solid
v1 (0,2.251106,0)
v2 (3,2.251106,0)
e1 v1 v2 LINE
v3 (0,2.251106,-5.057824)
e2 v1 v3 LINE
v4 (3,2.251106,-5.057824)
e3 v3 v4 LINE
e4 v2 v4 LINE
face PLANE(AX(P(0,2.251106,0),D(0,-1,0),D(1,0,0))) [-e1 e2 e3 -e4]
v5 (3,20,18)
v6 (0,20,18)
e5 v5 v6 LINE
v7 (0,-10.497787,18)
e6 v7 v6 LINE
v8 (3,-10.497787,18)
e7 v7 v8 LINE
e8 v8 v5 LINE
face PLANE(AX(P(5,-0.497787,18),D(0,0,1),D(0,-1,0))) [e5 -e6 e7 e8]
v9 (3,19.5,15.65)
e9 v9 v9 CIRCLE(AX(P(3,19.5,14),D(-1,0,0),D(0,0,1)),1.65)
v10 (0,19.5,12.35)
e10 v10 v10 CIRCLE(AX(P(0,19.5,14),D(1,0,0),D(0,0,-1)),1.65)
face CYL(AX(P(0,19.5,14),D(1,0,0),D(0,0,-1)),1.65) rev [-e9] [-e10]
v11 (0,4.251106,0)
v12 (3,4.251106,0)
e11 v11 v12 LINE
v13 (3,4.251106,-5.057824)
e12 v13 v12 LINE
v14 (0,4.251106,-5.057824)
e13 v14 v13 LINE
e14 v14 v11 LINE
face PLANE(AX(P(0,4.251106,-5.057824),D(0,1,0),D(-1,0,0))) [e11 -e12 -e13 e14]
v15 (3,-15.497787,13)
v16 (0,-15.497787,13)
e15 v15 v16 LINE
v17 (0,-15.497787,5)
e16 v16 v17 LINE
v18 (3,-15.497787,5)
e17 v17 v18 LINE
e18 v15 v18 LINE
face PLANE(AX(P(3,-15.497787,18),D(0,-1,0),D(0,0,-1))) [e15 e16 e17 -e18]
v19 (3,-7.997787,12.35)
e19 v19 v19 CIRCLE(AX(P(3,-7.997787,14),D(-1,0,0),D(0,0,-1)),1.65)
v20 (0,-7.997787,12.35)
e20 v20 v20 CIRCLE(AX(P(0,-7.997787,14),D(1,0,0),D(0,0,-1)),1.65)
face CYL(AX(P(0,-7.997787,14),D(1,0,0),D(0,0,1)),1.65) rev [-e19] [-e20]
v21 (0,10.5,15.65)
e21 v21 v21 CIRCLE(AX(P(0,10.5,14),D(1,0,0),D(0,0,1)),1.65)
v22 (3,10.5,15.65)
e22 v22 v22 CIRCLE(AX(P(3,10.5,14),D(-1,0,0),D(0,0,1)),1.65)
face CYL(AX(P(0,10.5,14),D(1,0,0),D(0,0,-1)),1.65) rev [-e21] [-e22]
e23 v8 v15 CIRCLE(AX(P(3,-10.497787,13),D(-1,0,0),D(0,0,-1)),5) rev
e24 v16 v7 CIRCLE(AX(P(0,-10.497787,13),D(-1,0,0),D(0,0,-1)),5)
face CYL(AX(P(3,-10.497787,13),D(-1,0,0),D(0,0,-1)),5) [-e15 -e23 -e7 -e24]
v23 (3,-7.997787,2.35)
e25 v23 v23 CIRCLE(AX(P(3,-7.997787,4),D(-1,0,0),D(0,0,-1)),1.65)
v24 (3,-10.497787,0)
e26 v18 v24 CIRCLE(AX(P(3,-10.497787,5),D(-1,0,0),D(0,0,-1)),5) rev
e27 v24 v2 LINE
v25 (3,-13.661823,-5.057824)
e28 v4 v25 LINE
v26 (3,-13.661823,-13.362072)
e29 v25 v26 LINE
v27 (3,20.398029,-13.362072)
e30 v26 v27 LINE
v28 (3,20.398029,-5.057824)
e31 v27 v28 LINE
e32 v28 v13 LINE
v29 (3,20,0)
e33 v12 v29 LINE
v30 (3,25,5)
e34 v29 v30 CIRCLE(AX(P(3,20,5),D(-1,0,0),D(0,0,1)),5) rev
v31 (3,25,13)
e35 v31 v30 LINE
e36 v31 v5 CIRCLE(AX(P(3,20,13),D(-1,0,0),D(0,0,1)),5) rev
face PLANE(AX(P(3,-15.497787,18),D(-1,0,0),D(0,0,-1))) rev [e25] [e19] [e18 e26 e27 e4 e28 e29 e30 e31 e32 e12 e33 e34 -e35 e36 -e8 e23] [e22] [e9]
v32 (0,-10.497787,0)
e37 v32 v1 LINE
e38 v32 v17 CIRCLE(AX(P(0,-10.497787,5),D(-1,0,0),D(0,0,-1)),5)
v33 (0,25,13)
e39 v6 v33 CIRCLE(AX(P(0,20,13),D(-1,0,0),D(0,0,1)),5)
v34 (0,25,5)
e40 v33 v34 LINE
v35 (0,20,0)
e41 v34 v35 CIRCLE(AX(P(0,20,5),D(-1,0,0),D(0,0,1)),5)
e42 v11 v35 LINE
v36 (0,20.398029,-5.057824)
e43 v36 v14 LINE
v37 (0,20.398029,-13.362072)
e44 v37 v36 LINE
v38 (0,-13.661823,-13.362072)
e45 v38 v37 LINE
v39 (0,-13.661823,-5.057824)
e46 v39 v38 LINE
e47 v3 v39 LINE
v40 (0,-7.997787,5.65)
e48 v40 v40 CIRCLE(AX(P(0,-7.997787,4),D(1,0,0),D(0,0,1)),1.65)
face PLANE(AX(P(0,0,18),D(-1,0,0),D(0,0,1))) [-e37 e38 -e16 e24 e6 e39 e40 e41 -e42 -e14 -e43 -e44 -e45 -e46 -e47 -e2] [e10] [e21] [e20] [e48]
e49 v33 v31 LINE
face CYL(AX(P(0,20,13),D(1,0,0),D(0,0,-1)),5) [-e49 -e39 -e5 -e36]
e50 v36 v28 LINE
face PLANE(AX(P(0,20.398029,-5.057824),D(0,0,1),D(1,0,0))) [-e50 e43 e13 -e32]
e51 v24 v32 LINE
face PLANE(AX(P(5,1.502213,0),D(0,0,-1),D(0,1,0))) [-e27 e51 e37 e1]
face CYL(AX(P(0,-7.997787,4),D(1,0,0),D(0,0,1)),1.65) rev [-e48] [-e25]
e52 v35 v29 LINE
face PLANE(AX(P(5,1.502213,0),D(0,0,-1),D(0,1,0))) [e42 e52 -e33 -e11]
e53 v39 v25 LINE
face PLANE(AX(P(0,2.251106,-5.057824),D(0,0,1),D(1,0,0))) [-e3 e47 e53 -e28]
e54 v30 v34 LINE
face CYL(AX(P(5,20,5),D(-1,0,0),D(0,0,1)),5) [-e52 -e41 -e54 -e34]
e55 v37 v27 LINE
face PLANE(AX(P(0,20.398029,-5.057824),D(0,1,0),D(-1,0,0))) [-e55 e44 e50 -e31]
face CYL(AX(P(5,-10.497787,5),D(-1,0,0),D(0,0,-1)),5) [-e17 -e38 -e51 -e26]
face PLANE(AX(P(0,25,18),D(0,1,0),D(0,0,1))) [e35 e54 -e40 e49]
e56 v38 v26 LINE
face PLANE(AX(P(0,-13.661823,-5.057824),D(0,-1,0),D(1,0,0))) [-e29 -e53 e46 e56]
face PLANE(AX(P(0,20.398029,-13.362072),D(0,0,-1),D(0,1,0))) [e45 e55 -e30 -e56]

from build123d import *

# Parameters (mm, degrees)
T_LE_DE_BASE_PLI_E1_DEPTH    = 18
ENL_V_MAT_EXTRU_1_DEPTH      = 36.185224172
ENL_V_MAT_EXTRU_1_DEPTH_BACK = 36.185224172
ESQUISSE6_R                  = 1.65
ENL_V_MAT_EXTRU_2_DEPTH      = 35.756294394
ENL_V_MAT_EXTRU_2_DEPTH_BACK = 35.756294394
ESQUISSE7_R                  = 1.65
CONG_1_R                     = 5
BOSS_EXTRU_1_OUTLINE_R       = 1.65
BOSS_EXTRU_1_DEPTH           = 17
BOSS_EXTRU_1_START           = -3
BOSS_EXTRU_1_2_OUTLINE_R     = 1.65
BOSS_EXTRU_1_2_DEPTH         = 3


with BuildPart() as part:
    # Tôle de base pliée1: sheet metal written as solids
    # Esquisse1 → Tôle de base pliée1 (new body)
    with BuildSketch(Plane.XY):
        with BuildLine():
            Line((20, 0), (5, 0))
            ThreePointArc((5, 0), (1.464466094, 1.464466094), (0, 5))
            Line((0, 5), (0, 25))
            Line((0, 25), (3, 25))
            Line((3, 25), (3, 5))
            ThreePointArc((3, 5), (3.585786438, 3.585786438), (5, 3))
            Line((5, 3), (20, 3))
            Line((20, 3), (20, 0))
        make_face()
    extrude(amount=T_LE_DE_BASE_PLI_E1_DEPTH)

    # Esquisse6 → Enlèv. mat.-Extru.1 (cut, two sides: drawn at the far end of the back side and taken through both)
    with BuildSketch(Plane(origin=(3, 0, 0), x_dir=(0, 0, -1), z_dir=(1, 0, 0)).offset(-ENL_V_MAT_EXTRU_1_DEPTH_BACK)):
        with Locations((-14, 19.5)):
            Circle(ESQUISSE6_R)
        with Locations(Location((-14, 10.5, 0), (0, 0, 180))):
            Circle(ESQUISSE6_R)
    extrude(amount=ENL_V_MAT_EXTRU_1_DEPTH + ENL_V_MAT_EXTRU_1_DEPTH_BACK, mode=Mode.SUBTRACT)

    # Esquisse7 → Enlèv. mat.-Extru.2 (cut, two sides: drawn at the far end of the back side and taken through both)
    with BuildSketch(Plane(origin=(0, 3, 0), x_dir=(1, 0, 0), z_dir=(0, 1, 0)).offset(-ENL_V_MAT_EXTRU_2_DEPTH_BACK)):
        with Locations(Location((12.5, -4, 0), (0, 0, 270))):
            Circle(ESQUISSE7_R)
        with Locations(Location((12.5, -14, 0), (0, 0, 90))):
            Circle(ESQUISSE7_R)
    extrude(amount=ENL_V_MAT_EXTRU_2_DEPTH + ENL_V_MAT_EXTRU_2_DEPTH_BACK, mode=Mode.SUBTRACT)

    # Congé1
    cong_1_edges = [part.edges().sort_by_distance(p)[0] for p in [
        (20, 1.5, 18),
        (1.5, 25, 18),
        (20, 1.5, 0),
        (1.5, 25, 0),
    ]]
    fillet(cong_1_edges, radius=CONG_1_R)

    # Boss.-Extru.1: read off the stored shape, not the designer's step
    # Boss.-Extru.1 outline → Boss.-Extru.1 (cut)
    with BuildSketch(Plane(origin=(3, 0, 0), x_dir=(0, 0, -1), z_dir=(1, 0, 0))):
        with BuildLine():
            Line((-13, -15.497787144), (-5, -15.497787144))
            ThreePointArc((-5, -15.497787144), (-1.464466094, -14.03332105), (0, -10.497787144))
            Line((0, -10.497787144), (0, 2.251106428))
            Line((0, 2.251106428), (5.057824139, 2.251106428))
            Line((5.057824139, 2.251106428), (5.057824139, -13.661822952))
            Line((5.057824139, -13.661822952), (13.362072183, -13.661822952))
            Line((13.362072183, -13.661822952), (13.362072183, 20.398028744))
            Line((13.362072183, 20.398028744), (5.057824139, 20.398028744))
            Line((5.057824139, 20.398028744), (5.057824139, 4.251106428))
            Line((5.057824139, 4.251106428), (0, 4.251106428))
            Line((0, 4.251106428), (0, 20))
            ThreePointArc((0, 20), (-1.464466094, 23.535533906), (-5, 25))
            Line((-5, 25), (-13, 25))
            ThreePointArc((-13, 25), (-16.535533906, 23.535533906), (-18, 20))
            Line((-18, 20), (-18, -10.497787144))
            ThreePointArc((-18, -10.497787144), (-16.535533906, -14.03332105), (-13, -15.497787144))
        make_face()
        with Locations((-14, -7.997787144)):
            Circle(BOSS_EXTRU_1_OUTLINE_R, mode=Mode.SUBTRACT)
        with Locations((-4, -7.997787144)):
            Circle(BOSS_EXTRU_1_OUTLINE_R, mode=Mode.SUBTRACT)
        with Locations((-14, 10.5)):
            Circle(BOSS_EXTRU_1_OUTLINE_R, mode=Mode.SUBTRACT)
        with Locations((-14, 19.5)):
            Circle(BOSS_EXTRU_1_OUTLINE_R, mode=Mode.SUBTRACT)
    extrude(amount=BOSS_EXTRU_1_DEPTH, mode=Mode.SUBTRACT)

    # Boss.-Extru.1 2 outline → Boss.-Extru.1 2 (add)
    with BuildSketch(Plane(origin=(3, 0, 0), x_dir=(0, 0, -1), z_dir=(1, 0, 0)).offset(BOSS_EXTRU_1_START)):
        with BuildLine():
            Line((-13, -15.497787144), (-5, -15.497787144))
            ThreePointArc((-5, -15.497787144), (-1.464466094, -14.03332105), (0, -10.497787144))
            Line((0, -10.497787144), (0, 2.251106428))
            Line((0, 2.251106428), (5.057824139, 2.251106428))
            Line((5.057824139, 2.251106428), (5.057824139, -13.661822952))
            Line((5.057824139, -13.661822952), (13.362072183, -13.661822952))
            Line((13.362072183, -13.661822952), (13.362072183, 20.398028744))
            Line((13.362072183, 20.398028744), (5.057824139, 20.398028744))
            Line((5.057824139, 20.398028744), (5.057824139, 4.251106428))
            Line((5.057824139, 4.251106428), (0, 4.251106428))
            Line((0, 4.251106428), (0, 20))
            ThreePointArc((0, 20), (-1.464466094, 23.535533906), (-5, 25))
            Line((-5, 25), (-13, 25))
            ThreePointArc((-13, 25), (-16.535533906, 23.535533906), (-18, 20))
            Line((-18, 20), (-18, -10.497787144))
            ThreePointArc((-18, -10.497787144), (-16.535533906, -14.03332105), (-13, -15.497787144))
        make_face()
        with Locations((-14, -7.997787144)):
            Circle(BOSS_EXTRU_1_2_OUTLINE_R, mode=Mode.SUBTRACT)
        with Locations((-4, -7.997787144)):
            Circle(BOSS_EXTRU_1_2_OUTLINE_R, mode=Mode.SUBTRACT)
        with Locations((-14, 10.5)):
            Circle(BOSS_EXTRU_1_2_OUTLINE_R, mode=Mode.SUBTRACT)
        with Locations((-14, 19.5)):
            Circle(BOSS_EXTRU_1_2_OUTLINE_R, mode=Mode.SUBTRACT)
    extrude(amount=BOSS_EXTRU_1_2_DEPTH)


solid = part.part
